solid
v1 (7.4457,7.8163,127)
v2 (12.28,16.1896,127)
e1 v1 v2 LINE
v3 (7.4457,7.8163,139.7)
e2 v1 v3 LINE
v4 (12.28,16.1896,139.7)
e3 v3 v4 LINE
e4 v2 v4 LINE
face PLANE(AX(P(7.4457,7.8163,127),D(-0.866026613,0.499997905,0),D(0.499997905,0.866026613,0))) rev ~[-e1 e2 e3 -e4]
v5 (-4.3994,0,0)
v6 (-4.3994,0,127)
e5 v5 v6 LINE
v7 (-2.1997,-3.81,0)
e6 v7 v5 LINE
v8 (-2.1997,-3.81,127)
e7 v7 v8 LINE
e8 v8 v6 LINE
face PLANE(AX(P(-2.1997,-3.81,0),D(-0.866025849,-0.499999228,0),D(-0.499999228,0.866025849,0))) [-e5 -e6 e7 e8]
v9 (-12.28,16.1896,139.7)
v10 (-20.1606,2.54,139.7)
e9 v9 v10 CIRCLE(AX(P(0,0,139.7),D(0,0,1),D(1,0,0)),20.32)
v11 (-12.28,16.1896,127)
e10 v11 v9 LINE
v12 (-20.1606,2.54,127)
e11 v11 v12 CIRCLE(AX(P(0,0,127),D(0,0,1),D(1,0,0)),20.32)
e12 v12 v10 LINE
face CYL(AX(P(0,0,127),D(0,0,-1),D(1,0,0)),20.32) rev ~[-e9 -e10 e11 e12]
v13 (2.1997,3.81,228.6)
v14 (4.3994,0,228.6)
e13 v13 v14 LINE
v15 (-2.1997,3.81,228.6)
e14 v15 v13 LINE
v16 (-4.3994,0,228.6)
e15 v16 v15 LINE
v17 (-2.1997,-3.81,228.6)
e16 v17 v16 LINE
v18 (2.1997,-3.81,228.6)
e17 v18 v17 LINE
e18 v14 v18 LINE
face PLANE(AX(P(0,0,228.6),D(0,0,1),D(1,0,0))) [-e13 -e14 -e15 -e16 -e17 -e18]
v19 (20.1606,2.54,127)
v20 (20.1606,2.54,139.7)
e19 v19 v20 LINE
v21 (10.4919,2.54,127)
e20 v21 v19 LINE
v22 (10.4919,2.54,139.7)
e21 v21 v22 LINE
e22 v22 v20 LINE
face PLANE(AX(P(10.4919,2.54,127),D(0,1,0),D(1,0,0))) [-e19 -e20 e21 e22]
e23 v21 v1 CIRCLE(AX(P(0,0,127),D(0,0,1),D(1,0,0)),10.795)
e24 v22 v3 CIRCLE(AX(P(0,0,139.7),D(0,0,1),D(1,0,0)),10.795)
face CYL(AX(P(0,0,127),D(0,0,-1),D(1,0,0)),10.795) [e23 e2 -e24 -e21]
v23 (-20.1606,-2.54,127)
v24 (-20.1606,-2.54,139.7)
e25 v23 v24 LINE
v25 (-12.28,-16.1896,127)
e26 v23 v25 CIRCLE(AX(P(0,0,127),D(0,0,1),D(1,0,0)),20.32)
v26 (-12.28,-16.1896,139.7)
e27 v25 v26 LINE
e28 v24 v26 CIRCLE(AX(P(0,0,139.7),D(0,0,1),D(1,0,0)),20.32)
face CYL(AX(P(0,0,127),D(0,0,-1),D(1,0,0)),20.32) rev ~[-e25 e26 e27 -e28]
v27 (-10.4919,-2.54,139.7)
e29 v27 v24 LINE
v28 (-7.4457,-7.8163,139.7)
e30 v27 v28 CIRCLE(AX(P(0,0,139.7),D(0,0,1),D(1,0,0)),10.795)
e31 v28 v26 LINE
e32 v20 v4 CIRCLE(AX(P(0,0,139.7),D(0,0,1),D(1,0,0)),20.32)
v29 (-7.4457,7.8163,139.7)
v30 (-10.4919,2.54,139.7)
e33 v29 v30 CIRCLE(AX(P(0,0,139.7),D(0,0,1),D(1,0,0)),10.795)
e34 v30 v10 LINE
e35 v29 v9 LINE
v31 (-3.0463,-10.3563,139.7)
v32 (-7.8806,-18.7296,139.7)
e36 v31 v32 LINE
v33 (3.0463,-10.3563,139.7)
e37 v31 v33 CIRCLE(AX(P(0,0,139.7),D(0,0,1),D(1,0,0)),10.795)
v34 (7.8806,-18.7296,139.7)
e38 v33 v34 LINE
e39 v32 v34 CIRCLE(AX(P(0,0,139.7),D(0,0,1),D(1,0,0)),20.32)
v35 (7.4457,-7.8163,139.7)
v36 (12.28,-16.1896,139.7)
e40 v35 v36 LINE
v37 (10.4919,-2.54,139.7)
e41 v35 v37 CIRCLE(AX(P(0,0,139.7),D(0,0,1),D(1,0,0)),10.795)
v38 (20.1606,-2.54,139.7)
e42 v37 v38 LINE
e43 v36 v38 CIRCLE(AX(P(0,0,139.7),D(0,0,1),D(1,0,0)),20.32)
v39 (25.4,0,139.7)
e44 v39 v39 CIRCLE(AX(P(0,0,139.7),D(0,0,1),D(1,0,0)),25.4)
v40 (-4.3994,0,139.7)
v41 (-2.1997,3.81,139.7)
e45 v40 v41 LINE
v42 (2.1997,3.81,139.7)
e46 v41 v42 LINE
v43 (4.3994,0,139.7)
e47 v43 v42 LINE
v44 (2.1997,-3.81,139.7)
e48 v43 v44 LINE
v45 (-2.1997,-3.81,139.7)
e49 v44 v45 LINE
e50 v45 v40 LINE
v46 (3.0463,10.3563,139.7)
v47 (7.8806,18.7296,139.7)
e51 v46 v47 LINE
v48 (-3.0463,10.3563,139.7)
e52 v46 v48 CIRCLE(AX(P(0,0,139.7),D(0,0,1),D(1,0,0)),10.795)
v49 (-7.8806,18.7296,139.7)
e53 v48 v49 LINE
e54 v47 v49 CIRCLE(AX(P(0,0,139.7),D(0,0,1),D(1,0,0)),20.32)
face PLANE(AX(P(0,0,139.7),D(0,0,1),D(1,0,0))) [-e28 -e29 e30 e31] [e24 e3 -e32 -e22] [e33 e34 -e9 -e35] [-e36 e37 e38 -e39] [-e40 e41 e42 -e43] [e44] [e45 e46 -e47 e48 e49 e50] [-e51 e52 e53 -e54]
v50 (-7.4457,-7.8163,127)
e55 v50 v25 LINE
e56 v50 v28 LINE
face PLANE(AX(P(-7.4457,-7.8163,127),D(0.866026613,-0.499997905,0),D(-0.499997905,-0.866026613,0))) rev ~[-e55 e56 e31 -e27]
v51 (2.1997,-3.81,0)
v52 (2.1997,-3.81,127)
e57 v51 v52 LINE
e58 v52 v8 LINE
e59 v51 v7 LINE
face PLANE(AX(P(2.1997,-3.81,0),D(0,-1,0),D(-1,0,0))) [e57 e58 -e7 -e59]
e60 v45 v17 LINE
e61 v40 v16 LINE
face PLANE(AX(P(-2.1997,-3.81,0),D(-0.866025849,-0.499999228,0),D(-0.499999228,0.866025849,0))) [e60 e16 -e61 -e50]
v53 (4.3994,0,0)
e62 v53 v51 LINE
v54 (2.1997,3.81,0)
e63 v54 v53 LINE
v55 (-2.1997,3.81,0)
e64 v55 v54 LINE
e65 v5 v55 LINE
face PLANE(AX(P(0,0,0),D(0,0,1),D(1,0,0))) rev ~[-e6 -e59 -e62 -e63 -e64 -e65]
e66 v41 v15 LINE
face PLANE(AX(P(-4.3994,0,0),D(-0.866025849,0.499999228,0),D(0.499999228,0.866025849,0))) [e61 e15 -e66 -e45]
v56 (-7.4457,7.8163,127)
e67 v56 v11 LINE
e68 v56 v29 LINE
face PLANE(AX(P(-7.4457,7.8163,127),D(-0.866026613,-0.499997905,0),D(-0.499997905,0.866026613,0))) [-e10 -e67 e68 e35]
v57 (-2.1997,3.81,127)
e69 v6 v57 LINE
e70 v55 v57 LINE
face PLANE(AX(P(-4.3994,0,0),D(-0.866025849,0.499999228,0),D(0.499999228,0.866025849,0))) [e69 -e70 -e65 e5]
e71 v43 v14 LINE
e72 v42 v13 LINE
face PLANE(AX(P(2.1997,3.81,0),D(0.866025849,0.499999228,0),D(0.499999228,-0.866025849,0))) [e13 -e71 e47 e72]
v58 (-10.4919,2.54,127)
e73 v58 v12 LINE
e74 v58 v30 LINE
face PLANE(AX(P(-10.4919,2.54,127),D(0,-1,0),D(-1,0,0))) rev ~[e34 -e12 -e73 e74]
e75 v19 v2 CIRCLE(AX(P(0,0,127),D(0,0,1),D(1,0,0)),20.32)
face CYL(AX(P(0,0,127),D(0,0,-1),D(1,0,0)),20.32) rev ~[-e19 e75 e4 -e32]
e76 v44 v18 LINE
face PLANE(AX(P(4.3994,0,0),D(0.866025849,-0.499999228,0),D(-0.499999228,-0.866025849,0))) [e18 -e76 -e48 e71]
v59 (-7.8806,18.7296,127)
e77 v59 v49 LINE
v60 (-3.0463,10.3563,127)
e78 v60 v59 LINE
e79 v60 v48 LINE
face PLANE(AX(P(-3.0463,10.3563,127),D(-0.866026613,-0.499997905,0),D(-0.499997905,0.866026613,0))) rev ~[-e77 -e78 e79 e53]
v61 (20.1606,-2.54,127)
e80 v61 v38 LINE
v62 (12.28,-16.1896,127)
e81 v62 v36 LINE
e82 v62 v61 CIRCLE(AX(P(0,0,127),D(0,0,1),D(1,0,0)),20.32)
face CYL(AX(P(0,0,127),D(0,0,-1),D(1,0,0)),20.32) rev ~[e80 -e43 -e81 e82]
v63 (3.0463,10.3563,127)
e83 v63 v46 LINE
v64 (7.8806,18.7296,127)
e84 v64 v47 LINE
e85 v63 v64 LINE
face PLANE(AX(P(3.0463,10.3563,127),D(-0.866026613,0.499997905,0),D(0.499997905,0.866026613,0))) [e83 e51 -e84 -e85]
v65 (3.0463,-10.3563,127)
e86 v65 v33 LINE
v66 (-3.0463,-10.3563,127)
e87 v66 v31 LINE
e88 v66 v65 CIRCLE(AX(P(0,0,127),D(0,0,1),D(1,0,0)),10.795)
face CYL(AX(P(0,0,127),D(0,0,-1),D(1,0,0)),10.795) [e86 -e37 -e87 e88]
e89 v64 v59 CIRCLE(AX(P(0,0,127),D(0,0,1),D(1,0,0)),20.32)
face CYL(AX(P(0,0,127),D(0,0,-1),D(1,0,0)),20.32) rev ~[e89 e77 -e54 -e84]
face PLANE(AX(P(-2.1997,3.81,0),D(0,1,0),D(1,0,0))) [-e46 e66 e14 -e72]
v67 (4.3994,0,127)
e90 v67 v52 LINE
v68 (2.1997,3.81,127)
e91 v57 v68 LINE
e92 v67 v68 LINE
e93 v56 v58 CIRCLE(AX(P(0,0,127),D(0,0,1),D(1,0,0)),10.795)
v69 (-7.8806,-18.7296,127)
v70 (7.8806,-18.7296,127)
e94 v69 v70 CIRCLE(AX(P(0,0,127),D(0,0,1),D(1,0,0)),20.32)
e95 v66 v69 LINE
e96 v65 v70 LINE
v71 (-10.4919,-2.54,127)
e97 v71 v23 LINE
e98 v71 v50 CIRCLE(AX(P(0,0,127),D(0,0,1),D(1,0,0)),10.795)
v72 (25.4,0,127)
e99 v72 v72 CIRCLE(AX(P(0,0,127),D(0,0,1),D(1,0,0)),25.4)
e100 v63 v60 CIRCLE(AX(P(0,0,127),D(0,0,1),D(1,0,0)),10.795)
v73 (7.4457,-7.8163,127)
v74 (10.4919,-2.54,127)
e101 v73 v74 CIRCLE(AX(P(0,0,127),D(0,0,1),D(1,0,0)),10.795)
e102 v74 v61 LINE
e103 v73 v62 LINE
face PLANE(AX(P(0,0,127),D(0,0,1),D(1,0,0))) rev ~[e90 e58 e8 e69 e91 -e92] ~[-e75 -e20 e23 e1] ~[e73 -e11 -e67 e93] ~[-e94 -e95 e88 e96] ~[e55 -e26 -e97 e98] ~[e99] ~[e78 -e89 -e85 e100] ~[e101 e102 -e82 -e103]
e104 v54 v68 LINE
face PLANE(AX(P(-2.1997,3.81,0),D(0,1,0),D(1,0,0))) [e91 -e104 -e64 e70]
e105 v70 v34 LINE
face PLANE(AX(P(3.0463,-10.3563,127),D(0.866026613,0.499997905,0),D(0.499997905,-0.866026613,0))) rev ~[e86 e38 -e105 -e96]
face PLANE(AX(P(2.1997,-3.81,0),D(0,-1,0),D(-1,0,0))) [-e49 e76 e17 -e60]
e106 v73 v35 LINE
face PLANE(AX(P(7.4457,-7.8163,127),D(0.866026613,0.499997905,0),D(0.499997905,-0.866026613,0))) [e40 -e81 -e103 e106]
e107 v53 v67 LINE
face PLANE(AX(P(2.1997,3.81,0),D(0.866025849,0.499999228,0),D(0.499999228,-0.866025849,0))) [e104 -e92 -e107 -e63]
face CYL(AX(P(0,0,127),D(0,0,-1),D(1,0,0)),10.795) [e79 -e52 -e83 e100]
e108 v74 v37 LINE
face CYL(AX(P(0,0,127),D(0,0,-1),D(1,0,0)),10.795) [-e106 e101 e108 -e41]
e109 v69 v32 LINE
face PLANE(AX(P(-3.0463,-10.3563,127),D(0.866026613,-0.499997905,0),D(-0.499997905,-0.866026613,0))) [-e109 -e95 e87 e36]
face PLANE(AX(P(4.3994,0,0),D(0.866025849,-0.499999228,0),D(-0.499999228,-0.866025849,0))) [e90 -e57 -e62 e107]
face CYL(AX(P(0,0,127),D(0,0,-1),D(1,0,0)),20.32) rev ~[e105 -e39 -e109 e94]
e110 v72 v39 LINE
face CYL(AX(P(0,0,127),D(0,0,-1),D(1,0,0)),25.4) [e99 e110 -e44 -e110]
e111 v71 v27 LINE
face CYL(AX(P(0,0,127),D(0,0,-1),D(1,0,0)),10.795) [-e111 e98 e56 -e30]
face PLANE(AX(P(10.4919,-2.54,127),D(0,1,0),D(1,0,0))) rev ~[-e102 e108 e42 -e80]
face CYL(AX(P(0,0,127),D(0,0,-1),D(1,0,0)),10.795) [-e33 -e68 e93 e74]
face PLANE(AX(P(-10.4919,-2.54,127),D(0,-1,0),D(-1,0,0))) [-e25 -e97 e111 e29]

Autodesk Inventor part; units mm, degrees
ref_plane "YZ Plane" through (0, 0, 0) normal (1, 0, 0) x (0, 1, 0)
ref_plane "XZ Plane" through (0, 0, 0) normal (0, 1, 0) x (-1, 0, 0)
sketch "Sketch1" plane through (0, 0, 0) normal (0, 0, 1) x (1, 0, 0)
  line L0 (2.1997, 3.81) -> (4.3994, 0)
  line L1 (4.3994, 0) -> (2.1997, -3.81)
  line L2 (2.1997, -3.81) -> (-2.1997, -3.81)
  line L3 (-2.1997, -3.81) -> (-4.3994, 0)
  line L4 (-4.3994, 0) -> (-2.1997, 3.81)
  line L5 (-2.1997, 3.81) -> (2.1997, 3.81)
  line L6 (0, 0) -> (1.0543, 0)
  dimension "d0" = 7.62
extrude "Extrusion1" add sketch "Sketch1" along normal blind 228.6
ref_plane "Work Plane1" through (0, 0, 127) normal (0, 0, 1) x (1, 0, 0)
sketch "Sketch2" plane through (0, 0, 127) normal (0, 0, 1) x (1, 0, 0)
  line L0 (2.1997, 3.81) -> (4.3994, 0) construction
  line L1 (4.3994, 0) -> (2.1997, -3.81) projected
  line L2 (2.1997, -3.81) -> (-2.1997, -3.81) projected
  line L3 (-2.1997, -3.81) -> (-4.3994, 0) projected
  line L4 (-4.3994, 0) -> (-2.1997, 3.81) projected
  line L5 (-2.1997, 3.81) -> (2.1997, 3.81) projected
  circle A0 centre (0, 0) radius 25.4
  circle A1 centre (0, 0) radius 20.32
  circle A2 centre (0, 0) radius 10.795
  line L6 (-2.1997, 3.81) -> (-4.3994, 0) projected
  line L7 (-4.3994, 0) -> (-2.1997, -3.81) projected
  line L8 (2.1997, -3.81) -> (4.3994, 0) projected
  line L9 (2.1997, 3.81) -> (-2.1997, 3.81) projected
  line L10 (4.3994, 0) -> (2.1997, 3.81) projected
  line L11 (-4.3994, 0) -> (-20.32, 0)
  line L12 (4.3994, 0) -> (20.32, 0)
  line L13 (10.4919, -2.54) -> (20.1606, -2.54)
  line L14 (10.4919, 2.54) -> (20.1606, 2.54)
  line L15 (-10.4919, 2.54) -> (-20.1606, 2.54)
  line L16 (-10.4919, -2.54) -> (-20.1606, -2.54)
  line L17 (-2.1997, 3.81) -> (-10.16, 17.5976)
  line L18 (2.1997, 3.81) -> (10.16, 17.5976)
  line L19 (-2.1997, -3.81) -> (2.1997, -3.81) projected
  line L20 (2.1997, -3.81) -> (10.16, -17.5976)
  line L21 (-2.1997, -3.81) -> (-10.16, -17.5976)
  line L22 (-7.4457, 7.8163) -> (-12.28, 16.1896)
  line L23 (-3.0463, 10.3563) -> (-7.8806, 18.7296)
  line L24 (3.0463, 10.3563) -> (7.8806, 18.7296)
  line L25 (7.4457, 7.8163) -> (12.28, 16.1896)
  line L26 (7.4457, -7.8163) -> (12.28, -16.1896)
  line L27 (3.0463, -10.3563) -> (7.8806, -18.7296)
  line L28 (-7.4457, -7.8163) -> (-12.28, -16.1896)
  line L29 (-3.0463, -10.3563) -> (-7.8806, -18.7296)
  dimension "d6" = 21.59
  dimension "d4" = 50.8
  dimension "d5" = 5.08
  dimension "d31" = 5.08
  dimension "d32" = 2.54
  dimension "d33" = 5.08
  dimension "d34" = 2.54
  dimension "d35" = 120
  dimension "d36" = 120
  dimension "d37" = 120
  dimension "d38" = 120
  dimension "d39" = 5.08
  dimension "d40" = 2.54
  dimension "d41" = 5.08
  dimension "d42" = 2.54
  dimension "d44" = 5.08
  dimension "d45" = 2.54
  dimension "d46" = 5.08
  dimension "d47" = 2.54
extrude "Extrusion3" add sketch "Sketch2" along normal blind 12.7 contours L12 A2 L20 L1 | L10 L18 A2 L12 | L20 A2 L21 L2 | L5 L17 A2 L18 | L12 A1 L13 A2 | A2 L14 A1 L12 | L21 A2 L11 L3 | L20 A1 L27 A2 | A2 L26 A1 L20 | L4 L11 A2 L17 | L18 A1 L25 A2 | A2 L24 A1 L18 | L21 A1 L28 A2 | A2 L29 A1 L21 | L17 A1 L23 A2 | A2 L22 A1 L17 | L11 A1 L15 A2 | A2 L16 A1 L11 | A0
equation "\"d36\" = d35"
equation "\"d37\" = d35"
equation "\"d38\" = d35"
properties part number "RobotArm HexWheel"
